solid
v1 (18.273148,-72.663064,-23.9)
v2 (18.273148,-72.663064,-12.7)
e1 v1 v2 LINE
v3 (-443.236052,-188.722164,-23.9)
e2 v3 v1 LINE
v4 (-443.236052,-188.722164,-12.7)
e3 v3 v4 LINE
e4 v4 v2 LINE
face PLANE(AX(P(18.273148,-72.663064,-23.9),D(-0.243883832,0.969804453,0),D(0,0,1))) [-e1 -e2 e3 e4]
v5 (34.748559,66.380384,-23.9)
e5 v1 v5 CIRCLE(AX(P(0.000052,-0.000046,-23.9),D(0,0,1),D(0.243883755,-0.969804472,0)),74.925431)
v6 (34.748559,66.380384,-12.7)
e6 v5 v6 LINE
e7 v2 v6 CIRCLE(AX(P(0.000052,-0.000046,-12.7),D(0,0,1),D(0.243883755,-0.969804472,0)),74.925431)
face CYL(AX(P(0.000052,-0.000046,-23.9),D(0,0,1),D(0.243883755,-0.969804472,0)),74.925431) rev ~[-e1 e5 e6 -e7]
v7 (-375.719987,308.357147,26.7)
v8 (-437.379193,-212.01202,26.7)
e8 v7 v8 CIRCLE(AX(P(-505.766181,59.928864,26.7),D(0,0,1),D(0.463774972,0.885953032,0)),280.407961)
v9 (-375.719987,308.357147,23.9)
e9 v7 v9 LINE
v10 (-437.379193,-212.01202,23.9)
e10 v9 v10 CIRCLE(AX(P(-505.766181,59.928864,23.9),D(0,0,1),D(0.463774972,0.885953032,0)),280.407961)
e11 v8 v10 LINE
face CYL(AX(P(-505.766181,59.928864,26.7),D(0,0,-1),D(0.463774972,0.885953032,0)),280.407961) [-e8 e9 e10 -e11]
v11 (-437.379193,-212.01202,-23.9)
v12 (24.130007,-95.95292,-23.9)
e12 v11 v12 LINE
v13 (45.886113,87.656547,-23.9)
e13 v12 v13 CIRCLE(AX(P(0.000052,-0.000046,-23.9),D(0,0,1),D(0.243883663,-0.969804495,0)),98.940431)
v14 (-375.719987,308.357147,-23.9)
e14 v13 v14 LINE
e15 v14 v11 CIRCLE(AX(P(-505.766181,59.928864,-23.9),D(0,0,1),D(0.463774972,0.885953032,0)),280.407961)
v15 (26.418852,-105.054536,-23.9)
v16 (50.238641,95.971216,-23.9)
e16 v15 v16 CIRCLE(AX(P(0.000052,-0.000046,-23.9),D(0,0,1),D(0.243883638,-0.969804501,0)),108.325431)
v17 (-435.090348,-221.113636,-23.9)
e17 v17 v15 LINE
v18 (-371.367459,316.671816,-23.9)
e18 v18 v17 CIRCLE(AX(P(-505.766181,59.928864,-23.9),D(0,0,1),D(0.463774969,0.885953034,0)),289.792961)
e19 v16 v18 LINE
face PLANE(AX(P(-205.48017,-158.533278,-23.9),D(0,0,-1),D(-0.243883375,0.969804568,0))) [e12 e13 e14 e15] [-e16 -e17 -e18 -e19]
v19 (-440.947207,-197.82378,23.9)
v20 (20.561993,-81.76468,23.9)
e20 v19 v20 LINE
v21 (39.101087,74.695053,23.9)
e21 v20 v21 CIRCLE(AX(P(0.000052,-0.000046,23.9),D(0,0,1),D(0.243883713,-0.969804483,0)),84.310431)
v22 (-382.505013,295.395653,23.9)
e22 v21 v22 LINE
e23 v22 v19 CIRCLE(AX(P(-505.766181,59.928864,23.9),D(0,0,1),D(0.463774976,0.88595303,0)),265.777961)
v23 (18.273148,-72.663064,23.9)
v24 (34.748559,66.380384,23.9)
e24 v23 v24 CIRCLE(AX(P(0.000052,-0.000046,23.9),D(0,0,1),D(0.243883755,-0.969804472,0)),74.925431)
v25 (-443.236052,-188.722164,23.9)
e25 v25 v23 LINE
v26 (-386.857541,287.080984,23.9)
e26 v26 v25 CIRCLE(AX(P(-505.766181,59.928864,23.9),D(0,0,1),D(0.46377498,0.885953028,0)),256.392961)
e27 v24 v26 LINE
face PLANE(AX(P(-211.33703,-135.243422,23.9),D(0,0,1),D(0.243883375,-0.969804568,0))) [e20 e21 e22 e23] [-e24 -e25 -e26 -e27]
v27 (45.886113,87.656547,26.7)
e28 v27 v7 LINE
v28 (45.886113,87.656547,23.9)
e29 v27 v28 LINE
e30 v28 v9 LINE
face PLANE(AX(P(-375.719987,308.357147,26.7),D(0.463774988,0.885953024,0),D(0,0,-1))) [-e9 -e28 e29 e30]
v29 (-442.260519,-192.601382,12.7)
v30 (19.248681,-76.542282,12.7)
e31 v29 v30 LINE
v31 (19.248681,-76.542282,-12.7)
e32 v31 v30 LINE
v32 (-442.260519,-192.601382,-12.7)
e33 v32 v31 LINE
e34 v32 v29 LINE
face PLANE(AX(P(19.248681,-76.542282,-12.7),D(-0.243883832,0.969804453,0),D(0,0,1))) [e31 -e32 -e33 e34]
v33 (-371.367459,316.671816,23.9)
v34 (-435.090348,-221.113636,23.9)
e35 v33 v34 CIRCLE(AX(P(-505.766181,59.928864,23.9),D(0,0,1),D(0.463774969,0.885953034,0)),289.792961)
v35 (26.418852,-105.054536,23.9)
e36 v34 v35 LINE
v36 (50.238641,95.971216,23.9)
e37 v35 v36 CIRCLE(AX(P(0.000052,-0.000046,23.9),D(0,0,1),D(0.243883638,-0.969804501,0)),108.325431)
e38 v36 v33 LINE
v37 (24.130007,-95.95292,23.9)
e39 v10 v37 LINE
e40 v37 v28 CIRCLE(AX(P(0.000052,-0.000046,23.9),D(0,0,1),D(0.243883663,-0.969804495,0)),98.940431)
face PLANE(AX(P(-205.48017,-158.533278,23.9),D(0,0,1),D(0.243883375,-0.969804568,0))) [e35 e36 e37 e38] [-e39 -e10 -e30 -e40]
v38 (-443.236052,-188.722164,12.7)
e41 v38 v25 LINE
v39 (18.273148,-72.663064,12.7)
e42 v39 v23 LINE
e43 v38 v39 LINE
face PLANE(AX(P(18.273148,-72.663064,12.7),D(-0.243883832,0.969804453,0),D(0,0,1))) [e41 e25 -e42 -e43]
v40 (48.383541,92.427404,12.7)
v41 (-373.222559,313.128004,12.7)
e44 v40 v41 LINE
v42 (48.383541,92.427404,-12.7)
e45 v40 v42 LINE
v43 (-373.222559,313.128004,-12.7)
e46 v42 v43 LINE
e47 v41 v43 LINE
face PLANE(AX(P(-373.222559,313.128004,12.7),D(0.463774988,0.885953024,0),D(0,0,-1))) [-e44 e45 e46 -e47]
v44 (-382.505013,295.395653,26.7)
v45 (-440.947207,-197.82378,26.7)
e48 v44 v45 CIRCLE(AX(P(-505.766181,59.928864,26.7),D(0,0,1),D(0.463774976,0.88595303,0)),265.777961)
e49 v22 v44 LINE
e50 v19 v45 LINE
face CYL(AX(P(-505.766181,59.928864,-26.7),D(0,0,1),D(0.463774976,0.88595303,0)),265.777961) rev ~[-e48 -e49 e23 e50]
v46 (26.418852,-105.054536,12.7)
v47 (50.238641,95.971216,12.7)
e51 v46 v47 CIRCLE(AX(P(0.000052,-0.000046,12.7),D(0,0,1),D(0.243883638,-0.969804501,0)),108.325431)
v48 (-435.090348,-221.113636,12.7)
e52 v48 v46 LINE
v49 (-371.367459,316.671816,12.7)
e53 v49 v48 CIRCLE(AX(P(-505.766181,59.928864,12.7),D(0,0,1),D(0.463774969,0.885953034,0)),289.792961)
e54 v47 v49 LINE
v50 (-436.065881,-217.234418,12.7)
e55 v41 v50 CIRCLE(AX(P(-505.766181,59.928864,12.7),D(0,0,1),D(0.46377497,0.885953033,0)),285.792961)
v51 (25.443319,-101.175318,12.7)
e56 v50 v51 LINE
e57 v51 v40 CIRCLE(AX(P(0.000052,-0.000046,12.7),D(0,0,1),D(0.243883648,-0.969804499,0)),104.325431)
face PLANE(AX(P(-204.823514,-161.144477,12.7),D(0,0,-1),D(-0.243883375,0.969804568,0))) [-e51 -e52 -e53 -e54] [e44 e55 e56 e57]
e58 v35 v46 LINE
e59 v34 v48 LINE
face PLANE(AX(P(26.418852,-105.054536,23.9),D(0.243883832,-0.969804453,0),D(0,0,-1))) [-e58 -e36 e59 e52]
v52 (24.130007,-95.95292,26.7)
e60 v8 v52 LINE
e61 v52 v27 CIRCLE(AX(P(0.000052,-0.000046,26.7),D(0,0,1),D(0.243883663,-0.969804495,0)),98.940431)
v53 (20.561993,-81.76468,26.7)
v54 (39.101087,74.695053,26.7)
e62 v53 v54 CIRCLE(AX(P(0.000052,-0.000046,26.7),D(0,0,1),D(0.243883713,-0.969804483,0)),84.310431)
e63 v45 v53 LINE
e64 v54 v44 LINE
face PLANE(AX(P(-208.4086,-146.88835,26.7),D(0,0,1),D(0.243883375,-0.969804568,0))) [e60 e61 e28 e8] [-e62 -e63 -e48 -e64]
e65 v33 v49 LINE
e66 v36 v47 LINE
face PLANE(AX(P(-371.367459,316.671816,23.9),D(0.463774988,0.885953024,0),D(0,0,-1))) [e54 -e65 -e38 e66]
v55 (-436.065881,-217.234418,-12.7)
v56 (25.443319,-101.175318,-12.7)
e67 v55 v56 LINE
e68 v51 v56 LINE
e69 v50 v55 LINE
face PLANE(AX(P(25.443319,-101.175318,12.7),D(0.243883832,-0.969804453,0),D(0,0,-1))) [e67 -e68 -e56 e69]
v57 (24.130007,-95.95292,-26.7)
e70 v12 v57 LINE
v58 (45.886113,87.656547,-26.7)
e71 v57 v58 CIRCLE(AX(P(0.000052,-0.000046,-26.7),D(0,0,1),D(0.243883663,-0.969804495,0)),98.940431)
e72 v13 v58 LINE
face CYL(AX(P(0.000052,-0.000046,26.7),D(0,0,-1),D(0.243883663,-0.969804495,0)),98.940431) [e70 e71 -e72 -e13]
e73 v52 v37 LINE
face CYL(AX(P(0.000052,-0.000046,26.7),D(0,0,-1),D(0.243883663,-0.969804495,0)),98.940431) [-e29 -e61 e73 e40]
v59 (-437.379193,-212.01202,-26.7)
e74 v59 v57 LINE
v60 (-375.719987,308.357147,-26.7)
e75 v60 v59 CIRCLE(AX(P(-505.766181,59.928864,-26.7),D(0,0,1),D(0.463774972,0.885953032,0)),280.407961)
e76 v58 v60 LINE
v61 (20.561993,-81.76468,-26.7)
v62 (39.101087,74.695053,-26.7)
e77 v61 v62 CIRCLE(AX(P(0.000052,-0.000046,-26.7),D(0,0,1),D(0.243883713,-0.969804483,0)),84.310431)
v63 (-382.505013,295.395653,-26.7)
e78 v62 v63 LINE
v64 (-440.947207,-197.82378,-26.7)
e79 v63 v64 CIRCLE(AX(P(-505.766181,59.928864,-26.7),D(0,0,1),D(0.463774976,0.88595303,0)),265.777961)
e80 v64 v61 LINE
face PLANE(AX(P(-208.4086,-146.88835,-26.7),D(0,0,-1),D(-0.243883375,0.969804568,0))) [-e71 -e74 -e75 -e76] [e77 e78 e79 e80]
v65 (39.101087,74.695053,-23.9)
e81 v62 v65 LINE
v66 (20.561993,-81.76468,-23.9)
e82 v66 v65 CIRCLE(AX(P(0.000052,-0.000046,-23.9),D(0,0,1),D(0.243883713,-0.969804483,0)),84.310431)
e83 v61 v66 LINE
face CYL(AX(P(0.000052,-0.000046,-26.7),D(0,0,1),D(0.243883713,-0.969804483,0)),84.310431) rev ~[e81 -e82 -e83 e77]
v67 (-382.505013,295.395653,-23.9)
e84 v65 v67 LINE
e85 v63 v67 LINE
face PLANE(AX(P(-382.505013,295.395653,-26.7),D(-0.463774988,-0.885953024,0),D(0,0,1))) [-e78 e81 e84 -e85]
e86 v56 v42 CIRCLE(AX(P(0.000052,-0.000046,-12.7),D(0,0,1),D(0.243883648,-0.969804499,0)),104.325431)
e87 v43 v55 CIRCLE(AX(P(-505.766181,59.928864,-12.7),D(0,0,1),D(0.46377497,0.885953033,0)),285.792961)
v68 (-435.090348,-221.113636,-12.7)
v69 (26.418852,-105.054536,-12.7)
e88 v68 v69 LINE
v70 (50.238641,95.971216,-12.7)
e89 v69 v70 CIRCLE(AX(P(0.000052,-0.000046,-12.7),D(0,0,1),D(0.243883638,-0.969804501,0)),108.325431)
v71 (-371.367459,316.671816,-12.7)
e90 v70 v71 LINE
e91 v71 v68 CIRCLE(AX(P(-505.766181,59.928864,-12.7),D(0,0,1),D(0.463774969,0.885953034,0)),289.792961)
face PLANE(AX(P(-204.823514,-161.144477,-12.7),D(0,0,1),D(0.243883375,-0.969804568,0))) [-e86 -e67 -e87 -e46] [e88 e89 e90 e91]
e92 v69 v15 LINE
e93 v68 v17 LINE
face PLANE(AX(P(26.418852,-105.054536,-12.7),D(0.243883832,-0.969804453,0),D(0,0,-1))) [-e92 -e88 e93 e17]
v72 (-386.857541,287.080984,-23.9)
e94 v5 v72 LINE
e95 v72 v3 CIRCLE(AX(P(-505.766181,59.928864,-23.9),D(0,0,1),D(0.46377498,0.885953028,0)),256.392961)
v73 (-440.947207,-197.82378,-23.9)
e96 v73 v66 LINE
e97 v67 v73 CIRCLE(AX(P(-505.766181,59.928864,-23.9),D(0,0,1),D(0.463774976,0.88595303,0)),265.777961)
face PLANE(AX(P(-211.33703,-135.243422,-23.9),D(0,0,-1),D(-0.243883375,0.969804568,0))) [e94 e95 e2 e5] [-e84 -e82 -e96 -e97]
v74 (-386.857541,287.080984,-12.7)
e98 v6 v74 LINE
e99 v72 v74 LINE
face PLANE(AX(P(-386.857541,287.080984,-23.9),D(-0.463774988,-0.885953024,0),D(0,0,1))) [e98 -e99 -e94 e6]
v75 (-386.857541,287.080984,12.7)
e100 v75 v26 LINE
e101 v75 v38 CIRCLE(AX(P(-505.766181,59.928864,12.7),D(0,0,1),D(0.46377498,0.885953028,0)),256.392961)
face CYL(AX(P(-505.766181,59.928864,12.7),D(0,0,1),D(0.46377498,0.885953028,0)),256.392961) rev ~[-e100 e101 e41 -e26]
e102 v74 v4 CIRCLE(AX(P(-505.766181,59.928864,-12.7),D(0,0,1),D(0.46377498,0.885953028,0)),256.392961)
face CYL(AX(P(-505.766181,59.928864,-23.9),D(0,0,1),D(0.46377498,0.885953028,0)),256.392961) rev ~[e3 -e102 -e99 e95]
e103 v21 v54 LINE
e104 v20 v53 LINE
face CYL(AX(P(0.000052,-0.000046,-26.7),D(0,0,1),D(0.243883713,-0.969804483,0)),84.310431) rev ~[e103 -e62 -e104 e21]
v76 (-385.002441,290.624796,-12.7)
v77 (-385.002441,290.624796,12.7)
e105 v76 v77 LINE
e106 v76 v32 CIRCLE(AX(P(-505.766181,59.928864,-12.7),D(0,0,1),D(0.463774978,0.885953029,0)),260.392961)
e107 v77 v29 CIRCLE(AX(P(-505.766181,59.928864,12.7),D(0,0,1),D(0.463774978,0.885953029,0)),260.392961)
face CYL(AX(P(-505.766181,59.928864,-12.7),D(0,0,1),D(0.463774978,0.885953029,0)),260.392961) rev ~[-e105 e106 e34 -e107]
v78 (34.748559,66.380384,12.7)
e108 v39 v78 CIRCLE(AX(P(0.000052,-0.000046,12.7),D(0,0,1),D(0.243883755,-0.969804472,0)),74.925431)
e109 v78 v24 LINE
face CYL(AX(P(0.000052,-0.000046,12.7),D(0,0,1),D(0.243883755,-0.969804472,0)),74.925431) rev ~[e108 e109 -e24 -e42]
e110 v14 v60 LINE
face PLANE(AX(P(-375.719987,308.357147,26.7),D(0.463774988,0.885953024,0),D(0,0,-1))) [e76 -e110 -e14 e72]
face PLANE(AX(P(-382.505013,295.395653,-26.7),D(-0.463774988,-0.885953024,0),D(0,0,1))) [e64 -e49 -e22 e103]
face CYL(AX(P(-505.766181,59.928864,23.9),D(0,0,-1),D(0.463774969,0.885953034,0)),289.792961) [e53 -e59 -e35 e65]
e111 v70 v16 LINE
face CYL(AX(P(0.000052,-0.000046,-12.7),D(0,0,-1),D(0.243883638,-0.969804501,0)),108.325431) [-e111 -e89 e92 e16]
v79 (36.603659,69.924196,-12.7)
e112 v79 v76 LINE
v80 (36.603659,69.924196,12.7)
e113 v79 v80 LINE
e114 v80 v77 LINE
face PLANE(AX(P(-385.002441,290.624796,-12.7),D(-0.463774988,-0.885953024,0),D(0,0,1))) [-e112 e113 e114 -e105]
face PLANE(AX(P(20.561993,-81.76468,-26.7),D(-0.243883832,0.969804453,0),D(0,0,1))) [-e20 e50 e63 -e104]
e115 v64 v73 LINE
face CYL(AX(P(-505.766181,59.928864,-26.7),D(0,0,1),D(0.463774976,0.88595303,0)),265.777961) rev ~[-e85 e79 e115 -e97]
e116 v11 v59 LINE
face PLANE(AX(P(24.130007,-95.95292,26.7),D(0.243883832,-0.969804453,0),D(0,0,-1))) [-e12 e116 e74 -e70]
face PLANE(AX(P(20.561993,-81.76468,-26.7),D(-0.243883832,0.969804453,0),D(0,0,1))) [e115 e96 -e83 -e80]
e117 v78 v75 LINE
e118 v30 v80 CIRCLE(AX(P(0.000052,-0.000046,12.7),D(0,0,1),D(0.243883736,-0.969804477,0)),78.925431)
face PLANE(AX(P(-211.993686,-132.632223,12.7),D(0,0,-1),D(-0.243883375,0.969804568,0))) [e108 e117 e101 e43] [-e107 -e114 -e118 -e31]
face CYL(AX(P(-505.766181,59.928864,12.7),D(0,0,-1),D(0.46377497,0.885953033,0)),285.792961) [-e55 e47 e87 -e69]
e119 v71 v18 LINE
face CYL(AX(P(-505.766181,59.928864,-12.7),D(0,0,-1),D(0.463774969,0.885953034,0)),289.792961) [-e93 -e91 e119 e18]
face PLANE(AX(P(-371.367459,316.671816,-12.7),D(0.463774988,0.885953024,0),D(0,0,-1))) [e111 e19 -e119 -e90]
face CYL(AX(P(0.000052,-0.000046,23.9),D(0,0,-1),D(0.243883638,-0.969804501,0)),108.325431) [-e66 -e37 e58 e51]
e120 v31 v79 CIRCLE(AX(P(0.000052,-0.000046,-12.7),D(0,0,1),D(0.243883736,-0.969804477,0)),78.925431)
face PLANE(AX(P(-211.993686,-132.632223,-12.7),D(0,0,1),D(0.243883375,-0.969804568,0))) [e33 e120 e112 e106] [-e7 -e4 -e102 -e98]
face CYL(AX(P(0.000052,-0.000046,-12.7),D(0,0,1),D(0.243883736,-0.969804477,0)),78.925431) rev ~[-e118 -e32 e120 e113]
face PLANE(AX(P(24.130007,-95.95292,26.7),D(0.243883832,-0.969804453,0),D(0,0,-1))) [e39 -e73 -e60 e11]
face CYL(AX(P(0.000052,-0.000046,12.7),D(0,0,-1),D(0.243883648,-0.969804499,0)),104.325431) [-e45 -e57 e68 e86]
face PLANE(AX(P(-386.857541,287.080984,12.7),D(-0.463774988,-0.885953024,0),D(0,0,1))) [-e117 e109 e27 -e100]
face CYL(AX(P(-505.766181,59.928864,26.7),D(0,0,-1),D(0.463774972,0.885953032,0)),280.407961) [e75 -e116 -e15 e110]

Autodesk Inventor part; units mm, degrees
ref_plane "Plano de trabajo2" through (0, 0, 0) normal (-1, 0, 0) x (0, 0, 1)
ref_plane "Plano de trabajo3" through (-505.7662, 59.9289, 0) normal (0.986769, 0.1621325, 0) x (0, 0, 1)
sketch "Trayectoria" plane through (0, 0, 0) normal (0, 0, 1) x (1, 0, 0)
  arc A0 (22.346, -88.8588) -> (42.4936, 81.1758) centre (0, 0) ccw
  arc A1 (-379.1125, 301.8764) -> (-439.1632, -204.9179) centre (-505.7662, 59.9289) ccw
  line L0 (-379.1125, 301.8764) -> (42.4936, 81.1758)
  line L1 (22.346, -88.8588) -> (-439.1632, -204.9179)
  dimension "d31" = 33.4
ref_plane "Plano de sección" through (42.4936, 81.1758, 0) normal (-0.8859531, 0.4637749, 0) x (0, 0, 1)
sketch "Boceto de sección" plane through (42.4936, 81.1758, 0) normal (-0.8859531, 0.4637749, 0) x (0, 0, 1)
  line L0 (-26.7, -7.315) -> (26.7, -7.315)
  line L1 (26.7, -7.315) -> (26.7, 7.315)
  line L2 (26.7, 7.315) -> (-26.7, 7.315)
  line L3 (-26.7, 7.315) -> (-26.7, -7.315)
  line L4 (-12.7, -12.7) -> (12.7, -12.7)
  line L5 (12.7, -12.7) -> (12.7, 12.7)
  line L6 (12.7, 12.7) -> (-12.7, 12.7)
  line L7 (-12.7, 12.7) -> (-12.7, -12.7)
  line L8 (-12.7, 0) -> (12.7, 0) construction
  line L9 (-23.9, -16.7) -> (-12.7, -16.7)
  line L10 (-12.7, -16.7) -> (-12.7, 16.7)
  line L11 (-12.7, 16.7) -> (-23.9, 16.7)
  line L12 (-23.9, 16.7) -> (-23.9, -16.7)
  line L13 (12.7, -16.7) -> (23.9, -16.7)
  line L14 (23.9, -16.7) -> (23.9, 16.7)
  line L15 (23.9, 16.7) -> (12.7, 16.7)
  line L16 (12.7, 16.7) -> (12.7, -16.7)
  line L17 (-26.7, 0) -> (26.7, 0) construction
  point P0 (0, 0)
  point P1 (0, 0)
  dimension "d21" = 14.63
  dimension "d22" = 25.4
  dimension "d23" = 25.4
  dimension "d24" = 11.2
  dimension "d31" = 33.4
  dimension "d32" = 53.4
sweep "Sólido" add profiles "Boceto de sección" path "Trayectoria"
pattern_of_one "Strand Pattern"
equation "\"d21\" = da_d2"
equation "\"d22\" = da_d1"
equation "\"d23\" = da_b1"
equation "\"d24\" = da_t1 + da_t2"
equation "\"d30\" = da_pt"
equation "\"da_p\" = 38.1"
equation "\"da_b1\" = 25.4"
equation "\"da_h2\" = 33.4"
equation "\"da_h3\" = 33.4"
equation "\"da_d1\" = 25.4"
equation "\"da_d2\" = 14.63"
equation "\"da_pt\" = 48.36"
equation "\"da_b\" = 53.4"
equation "\"da_t1\" = 6"
equation "\"da_t2\" = 5.2"
properties part number "Cadena de rodillos"
